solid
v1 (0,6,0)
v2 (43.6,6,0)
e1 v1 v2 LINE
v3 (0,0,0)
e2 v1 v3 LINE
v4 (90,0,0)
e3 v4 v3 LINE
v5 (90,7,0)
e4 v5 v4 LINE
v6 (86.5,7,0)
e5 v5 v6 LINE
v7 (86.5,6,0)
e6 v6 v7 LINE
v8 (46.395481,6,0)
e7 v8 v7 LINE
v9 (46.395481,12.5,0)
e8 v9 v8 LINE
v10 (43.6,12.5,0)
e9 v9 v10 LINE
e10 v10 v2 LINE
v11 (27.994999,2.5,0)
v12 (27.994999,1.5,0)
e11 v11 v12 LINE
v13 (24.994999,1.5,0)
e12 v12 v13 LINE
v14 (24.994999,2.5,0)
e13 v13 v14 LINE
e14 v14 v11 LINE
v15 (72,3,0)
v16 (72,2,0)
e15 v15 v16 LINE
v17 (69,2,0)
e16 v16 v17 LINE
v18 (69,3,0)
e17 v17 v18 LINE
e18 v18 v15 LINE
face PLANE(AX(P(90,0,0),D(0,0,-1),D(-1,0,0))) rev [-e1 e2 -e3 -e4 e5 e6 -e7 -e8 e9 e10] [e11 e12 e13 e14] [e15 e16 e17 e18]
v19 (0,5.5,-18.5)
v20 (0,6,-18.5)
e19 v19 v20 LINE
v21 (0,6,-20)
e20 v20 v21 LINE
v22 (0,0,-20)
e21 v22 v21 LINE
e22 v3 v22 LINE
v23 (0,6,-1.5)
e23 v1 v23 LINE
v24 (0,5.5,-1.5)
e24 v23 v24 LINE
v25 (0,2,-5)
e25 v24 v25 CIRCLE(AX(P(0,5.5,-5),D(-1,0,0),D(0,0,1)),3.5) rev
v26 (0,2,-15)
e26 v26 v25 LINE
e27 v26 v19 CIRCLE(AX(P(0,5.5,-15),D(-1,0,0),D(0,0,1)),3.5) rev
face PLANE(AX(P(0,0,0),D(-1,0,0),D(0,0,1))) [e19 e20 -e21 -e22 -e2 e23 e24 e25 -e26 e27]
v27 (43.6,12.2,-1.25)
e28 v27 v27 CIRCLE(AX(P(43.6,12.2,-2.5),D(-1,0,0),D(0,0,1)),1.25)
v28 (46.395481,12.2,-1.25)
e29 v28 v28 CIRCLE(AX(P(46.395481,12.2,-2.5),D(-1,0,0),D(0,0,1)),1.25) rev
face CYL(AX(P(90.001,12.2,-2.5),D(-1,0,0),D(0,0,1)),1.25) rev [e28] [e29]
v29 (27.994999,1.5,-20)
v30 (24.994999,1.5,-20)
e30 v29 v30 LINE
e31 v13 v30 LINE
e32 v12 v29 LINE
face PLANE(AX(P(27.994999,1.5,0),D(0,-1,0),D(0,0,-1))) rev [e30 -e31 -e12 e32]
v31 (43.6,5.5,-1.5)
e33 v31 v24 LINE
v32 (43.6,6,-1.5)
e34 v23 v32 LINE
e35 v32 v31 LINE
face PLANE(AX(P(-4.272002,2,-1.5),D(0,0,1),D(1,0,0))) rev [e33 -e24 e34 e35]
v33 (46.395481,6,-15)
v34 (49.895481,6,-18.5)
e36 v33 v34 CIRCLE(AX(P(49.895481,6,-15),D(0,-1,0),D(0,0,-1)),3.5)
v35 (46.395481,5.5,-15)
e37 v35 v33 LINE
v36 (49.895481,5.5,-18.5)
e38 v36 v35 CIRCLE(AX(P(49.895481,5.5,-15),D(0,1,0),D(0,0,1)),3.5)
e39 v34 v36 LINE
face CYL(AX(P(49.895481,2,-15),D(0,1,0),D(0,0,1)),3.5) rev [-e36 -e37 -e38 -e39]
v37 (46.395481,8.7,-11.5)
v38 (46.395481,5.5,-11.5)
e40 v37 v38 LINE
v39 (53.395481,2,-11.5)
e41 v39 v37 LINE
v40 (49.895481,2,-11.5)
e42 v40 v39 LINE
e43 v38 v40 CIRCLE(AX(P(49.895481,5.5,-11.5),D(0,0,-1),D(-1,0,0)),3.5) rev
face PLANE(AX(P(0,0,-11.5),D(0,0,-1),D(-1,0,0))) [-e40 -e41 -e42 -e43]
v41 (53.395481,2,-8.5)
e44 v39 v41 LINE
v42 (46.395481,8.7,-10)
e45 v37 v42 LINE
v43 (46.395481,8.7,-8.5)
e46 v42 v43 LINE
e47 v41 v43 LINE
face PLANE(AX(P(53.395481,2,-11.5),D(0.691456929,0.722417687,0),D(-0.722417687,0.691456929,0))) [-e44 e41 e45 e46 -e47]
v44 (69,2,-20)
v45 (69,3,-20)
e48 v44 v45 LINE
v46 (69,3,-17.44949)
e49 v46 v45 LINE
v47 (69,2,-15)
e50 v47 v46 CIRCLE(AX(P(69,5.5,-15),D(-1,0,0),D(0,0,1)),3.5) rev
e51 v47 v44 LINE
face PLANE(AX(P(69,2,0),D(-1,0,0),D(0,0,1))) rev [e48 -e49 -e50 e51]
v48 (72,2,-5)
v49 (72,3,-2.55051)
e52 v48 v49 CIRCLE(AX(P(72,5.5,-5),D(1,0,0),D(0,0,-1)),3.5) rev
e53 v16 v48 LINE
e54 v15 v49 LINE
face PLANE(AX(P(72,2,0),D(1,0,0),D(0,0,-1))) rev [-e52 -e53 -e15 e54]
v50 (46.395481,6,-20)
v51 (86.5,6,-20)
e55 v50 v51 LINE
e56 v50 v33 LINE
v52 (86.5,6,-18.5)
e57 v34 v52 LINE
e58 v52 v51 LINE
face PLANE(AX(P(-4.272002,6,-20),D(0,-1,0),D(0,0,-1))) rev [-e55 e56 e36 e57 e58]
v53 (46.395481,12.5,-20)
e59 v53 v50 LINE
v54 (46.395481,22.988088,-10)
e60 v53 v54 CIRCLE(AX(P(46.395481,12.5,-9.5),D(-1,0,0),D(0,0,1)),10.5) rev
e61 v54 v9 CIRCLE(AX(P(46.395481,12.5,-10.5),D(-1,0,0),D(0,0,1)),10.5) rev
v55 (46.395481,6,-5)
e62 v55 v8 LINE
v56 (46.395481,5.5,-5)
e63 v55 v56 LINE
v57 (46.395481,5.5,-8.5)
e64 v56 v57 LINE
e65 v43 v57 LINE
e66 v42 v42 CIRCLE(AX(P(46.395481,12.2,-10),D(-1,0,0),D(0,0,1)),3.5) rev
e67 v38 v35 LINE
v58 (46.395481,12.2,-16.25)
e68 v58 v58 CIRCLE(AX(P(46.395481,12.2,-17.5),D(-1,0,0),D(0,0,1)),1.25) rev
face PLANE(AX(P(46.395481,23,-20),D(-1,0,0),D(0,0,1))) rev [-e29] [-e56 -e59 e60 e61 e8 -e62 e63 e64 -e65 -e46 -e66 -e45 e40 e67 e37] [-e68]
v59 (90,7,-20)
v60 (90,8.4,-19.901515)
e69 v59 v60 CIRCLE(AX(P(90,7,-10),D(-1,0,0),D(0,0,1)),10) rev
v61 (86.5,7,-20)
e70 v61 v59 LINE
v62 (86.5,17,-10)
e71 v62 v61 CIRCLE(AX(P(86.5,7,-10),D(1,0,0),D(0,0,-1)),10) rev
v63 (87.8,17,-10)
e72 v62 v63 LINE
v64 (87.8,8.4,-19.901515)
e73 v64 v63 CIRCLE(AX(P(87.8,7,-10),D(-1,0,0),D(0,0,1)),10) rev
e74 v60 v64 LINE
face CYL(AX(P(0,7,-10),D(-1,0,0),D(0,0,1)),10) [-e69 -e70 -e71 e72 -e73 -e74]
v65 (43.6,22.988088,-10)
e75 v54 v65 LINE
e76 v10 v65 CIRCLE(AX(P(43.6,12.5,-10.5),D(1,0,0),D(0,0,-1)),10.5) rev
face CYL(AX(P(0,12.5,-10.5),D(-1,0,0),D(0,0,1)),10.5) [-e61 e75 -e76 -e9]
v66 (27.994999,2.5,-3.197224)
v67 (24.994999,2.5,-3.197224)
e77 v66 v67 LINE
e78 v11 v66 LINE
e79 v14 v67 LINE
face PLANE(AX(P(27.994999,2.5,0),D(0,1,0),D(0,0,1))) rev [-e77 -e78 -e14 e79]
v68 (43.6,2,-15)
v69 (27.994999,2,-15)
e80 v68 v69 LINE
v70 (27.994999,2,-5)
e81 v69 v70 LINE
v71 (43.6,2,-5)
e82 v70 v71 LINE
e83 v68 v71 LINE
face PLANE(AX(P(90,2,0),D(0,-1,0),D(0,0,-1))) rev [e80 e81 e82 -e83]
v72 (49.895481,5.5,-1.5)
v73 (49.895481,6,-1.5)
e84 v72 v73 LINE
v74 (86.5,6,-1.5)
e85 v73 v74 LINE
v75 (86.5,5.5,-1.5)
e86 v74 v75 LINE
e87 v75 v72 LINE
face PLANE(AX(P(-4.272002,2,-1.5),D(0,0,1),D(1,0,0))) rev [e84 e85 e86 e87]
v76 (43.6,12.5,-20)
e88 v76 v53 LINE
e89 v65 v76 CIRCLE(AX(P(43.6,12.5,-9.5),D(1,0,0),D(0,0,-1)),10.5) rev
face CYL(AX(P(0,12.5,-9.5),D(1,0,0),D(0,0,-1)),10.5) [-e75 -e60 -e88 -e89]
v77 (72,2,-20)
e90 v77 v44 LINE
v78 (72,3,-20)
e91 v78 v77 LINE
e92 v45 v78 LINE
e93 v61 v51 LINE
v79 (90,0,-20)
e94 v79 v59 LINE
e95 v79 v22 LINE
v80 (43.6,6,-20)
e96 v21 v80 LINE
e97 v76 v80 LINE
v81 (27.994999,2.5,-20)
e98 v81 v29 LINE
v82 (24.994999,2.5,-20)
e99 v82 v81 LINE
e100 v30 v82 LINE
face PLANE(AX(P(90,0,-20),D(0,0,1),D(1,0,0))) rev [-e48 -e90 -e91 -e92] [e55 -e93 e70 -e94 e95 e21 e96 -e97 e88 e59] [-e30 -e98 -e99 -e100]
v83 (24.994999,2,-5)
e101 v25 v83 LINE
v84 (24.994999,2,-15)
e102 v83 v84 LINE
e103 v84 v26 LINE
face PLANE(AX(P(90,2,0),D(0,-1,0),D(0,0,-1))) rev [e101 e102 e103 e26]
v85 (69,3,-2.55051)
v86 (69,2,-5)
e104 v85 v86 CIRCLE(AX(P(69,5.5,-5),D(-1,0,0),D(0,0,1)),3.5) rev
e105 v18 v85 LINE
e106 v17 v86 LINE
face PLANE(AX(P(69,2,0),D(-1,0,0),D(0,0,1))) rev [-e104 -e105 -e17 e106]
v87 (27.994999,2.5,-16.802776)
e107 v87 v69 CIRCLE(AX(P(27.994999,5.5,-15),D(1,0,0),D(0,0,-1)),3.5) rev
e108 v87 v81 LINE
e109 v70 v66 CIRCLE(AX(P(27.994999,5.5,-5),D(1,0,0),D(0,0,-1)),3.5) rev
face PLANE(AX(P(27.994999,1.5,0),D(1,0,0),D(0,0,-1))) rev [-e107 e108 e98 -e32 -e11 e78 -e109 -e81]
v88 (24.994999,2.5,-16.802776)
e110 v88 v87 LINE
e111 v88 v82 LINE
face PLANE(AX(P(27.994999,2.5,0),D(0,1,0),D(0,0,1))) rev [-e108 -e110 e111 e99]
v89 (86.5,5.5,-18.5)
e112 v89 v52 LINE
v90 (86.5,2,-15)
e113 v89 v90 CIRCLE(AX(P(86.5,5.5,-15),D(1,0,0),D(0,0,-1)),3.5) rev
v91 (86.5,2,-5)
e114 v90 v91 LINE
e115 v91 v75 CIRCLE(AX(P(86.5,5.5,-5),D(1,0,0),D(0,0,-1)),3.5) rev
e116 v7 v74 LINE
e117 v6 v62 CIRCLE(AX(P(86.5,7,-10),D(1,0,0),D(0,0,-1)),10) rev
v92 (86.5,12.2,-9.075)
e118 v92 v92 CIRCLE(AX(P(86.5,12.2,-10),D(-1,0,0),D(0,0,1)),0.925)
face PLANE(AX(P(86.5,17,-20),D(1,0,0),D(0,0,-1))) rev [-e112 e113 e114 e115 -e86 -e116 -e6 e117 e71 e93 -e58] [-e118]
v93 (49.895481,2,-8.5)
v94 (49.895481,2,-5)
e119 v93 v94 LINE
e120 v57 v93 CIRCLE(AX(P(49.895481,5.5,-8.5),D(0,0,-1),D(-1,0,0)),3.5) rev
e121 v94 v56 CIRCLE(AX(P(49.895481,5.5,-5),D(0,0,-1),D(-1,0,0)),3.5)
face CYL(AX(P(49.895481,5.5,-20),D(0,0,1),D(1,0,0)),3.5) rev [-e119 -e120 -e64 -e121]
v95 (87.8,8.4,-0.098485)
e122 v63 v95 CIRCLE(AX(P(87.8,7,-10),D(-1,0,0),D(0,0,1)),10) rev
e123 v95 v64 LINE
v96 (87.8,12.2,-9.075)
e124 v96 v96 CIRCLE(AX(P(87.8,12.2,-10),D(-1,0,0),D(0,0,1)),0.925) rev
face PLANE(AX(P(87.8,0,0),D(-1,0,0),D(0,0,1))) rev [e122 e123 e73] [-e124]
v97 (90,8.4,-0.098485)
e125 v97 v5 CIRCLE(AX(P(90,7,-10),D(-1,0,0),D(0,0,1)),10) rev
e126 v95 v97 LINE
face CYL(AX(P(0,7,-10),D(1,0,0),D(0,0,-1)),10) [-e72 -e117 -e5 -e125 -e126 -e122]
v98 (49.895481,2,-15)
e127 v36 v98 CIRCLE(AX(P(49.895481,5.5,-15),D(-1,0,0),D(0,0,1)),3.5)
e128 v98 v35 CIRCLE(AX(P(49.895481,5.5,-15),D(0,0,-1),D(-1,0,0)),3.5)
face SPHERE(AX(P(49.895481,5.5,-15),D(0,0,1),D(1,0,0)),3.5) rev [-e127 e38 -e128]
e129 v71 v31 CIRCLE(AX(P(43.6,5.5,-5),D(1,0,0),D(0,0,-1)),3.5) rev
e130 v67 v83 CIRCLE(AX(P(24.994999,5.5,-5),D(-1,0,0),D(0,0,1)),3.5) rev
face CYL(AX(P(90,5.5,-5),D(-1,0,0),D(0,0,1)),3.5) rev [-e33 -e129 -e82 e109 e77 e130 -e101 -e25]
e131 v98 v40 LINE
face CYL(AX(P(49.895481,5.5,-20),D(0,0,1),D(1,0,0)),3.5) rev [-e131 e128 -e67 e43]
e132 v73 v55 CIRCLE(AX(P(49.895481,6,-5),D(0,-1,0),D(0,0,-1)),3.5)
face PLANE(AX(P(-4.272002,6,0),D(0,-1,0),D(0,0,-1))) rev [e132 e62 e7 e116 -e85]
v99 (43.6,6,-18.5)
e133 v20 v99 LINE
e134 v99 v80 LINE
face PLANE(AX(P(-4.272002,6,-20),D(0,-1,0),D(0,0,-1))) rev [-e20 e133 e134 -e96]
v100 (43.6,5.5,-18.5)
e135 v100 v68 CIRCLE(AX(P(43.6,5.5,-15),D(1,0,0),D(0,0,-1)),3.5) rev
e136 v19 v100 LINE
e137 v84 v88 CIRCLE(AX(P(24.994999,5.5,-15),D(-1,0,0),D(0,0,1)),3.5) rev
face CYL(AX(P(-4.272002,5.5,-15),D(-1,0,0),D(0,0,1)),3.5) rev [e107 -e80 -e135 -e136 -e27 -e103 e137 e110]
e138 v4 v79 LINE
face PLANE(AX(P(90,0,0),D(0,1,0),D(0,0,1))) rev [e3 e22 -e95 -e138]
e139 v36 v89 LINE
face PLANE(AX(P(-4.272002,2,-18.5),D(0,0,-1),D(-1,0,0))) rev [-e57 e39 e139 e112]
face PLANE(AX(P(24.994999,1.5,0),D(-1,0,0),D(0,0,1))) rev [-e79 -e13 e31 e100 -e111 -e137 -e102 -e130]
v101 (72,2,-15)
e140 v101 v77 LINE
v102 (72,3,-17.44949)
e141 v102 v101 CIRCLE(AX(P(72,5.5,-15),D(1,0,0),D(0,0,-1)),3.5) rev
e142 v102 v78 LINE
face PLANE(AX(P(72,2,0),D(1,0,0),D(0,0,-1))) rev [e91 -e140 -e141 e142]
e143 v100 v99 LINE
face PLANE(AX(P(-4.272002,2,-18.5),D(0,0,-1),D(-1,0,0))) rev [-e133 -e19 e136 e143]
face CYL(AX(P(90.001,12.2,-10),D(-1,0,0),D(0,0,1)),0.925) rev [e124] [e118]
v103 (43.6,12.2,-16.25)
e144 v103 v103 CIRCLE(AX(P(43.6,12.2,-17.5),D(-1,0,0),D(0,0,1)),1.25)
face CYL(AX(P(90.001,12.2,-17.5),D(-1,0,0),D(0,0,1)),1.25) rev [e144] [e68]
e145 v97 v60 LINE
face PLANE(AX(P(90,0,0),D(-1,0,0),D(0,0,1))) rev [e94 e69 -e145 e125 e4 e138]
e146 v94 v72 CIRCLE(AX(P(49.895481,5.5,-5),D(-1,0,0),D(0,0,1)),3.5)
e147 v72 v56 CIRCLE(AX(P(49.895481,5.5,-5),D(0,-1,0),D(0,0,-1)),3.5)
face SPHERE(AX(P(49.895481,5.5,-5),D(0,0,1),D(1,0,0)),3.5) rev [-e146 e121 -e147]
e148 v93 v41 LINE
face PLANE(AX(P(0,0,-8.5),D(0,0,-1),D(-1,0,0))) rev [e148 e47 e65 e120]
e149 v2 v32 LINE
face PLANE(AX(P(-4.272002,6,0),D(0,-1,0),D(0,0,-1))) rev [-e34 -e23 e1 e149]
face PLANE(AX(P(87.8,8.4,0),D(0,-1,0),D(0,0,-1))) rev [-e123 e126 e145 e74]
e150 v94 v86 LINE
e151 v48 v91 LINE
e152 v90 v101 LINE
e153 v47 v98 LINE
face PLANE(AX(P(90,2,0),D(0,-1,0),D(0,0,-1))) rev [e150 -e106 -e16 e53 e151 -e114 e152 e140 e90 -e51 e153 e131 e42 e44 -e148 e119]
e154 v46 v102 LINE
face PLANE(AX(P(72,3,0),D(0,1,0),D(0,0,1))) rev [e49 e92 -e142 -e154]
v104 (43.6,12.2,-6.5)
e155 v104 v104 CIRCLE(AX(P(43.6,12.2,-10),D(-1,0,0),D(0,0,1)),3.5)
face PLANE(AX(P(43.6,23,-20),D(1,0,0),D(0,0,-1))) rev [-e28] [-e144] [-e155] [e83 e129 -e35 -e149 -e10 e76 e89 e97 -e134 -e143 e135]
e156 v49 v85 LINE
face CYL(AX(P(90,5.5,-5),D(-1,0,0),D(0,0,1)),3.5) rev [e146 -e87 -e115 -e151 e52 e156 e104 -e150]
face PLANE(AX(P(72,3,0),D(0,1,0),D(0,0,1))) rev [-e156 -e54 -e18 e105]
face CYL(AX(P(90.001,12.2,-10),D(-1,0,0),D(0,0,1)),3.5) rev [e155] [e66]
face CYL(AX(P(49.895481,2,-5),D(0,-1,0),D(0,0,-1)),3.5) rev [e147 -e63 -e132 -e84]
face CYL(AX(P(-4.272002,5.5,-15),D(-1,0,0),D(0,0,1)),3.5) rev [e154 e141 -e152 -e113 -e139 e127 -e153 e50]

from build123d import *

# Parameters (mm, degrees)
SKETCH1_W                = 20
SKETCH1_H                = 2
BOSS_EXTRUDE1_DEPTH      = 90
SKETCH2_W                = 2.795480737
SKETCH2_H                = 20
BOSS_EXTRUDE2_DEPTH      = 21
SKETCH3_W                = 3.5
SKETCH3_H                = 20
BOSS_EXTRUDE3_DEPTH      = 15
FILLET1_R                = 10.5
FILLET2_R                = 10
BOSS_EXTRUDE4_REACH      = 93.71
SKETCH4_W                = 1.5
SKETCH4_H                = 4
CUT_EXTRUDE1_REACH       = 57.51
SKETCH5_R                = 1.25
SKETCH5_R_2              = 3.5
CUT_EXTRUDE2_REACH       = 93.71
SKETCH6_R                = 0.925
SKETCH7_W                = 20
SKETCH7_H                = 8.6
CUT_EXTRUDE3_DEPTH       = 2.2
FILLET3_R                = 3.5
FILLET4_R                = 3.5
SKETCH8_W                = 3
SKETCH8_H                = 1
ZIPTIEHOLE_DEPTH         = 96.0181678
BOSS_EXTRUDE5_DEPTH      = 1.5
BOSS_EXTRUDE5_DEPTH_BACK = 1.5


# Some blends are built 0.0001 mm under size
with BuildPart() as part:
    # Sketch1 → Boss-Extrude1 (new body)
    with BuildSketch(Plane(origin=(0, 0, 0), x_dir=(0, 0, -1), z_dir=(1, 0, 0))):
        with Locations((10, 1)):
            Rectangle(SKETCH1_W, SKETCH1_H)
    extrude(amount=BOSS_EXTRUDE1_DEPTH)

    # Sketch2 → Boss-Extrude2 (add)
    with BuildSketch(Plane(origin=(0, 2, 0), x_dir=(1, 0, 0), z_dir=(0, 1, 0))):
        with Locations((44.997740369, 10)):
            Rectangle(SKETCH2_W, SKETCH2_H)
    extrude(amount=BOSS_EXTRUDE2_DEPTH)

    # Sketch3 → Boss-Extrude3 (add)
    with BuildSketch(Plane(origin=(0, 2, 0), x_dir=(1, 0, 0), z_dir=(0, 1, 0))):
        with Locations((88.25, 10)):
            Rectangle(SKETCH3_W, SKETCH3_H)
    extrude(amount=BOSS_EXTRUDE3_DEPTH)

    # Fillet1
    # the kernel refuses this fillet: 10.5 mm, written as the material it takes off along each edge
    with BuildSketch(Plane(origin=(72.645480737, 23, 0), x_dir=(0, 0, -1), z_dir=(-1, 0, 0)), Plane(origin=(17.35, 23, -20), x_dir=(0, 0, 1), z_dir=(1, 0, 0))) as fillet1_piece_1:
        with BuildLine():
            CenterArc((FILLET1_R, FILLET1_R), FILLET1_R, 180, 90)
            Line((0, FILLET1_R), (0, 0))
            Line((0, 0), (FILLET1_R, 0))
        make_face()
    extrude(amount=55.295480737, mode=Mode.SUBTRACT)

    # Fillet2
    fillet2_edges = [part.edges().sort_by_distance(p)[0] for p in [
        (88.25, 17, -20),
        (88.25, 17, 0),
    ]]
    fillet(fillet2_edges, radius=FILLET2_R - 0.0001)  # a hair under: the kernel refuses the full size

    # Boss-Extrude4: up to this face of the body (flat: up to its plane)
    boss_extrude4_end = Plane(part.part.faces().sort_by_distance((0, 1, -10))[0])
    # Sketch4 → Boss-Extrude4 (add, up to the picked face)
    with BuildSketch(Plane.ZY.offset(-86.5), mode=Mode.PRIVATE) as boss_extrude4_sk1:
        with Locations((-0.75, 4)):
            Rectangle(SKETCH4_W, SKETCH4_H)
    boss_extrude4_tool1 = split(extrude(boss_extrude4_sk1.sketch, amount=BOSS_EXTRUDE4_REACH, mode=Mode.PRIVATE), bisect_by=boss_extrude4_end, keep=Keep.BOTH, mode=Mode.PRIVATE)
    # Sketch4 → Boss-Extrude4 (add, up to the picked face)
    with BuildSketch(Plane.ZY.offset(-86.5), mode=Mode.PRIVATE) as boss_extrude4_sk2:
        with Locations((-19.25, 4)):
            Rectangle(SKETCH4_W, SKETCH4_H)
    boss_extrude4_tool2 = split(extrude(boss_extrude4_sk2.sketch, amount=BOSS_EXTRUDE4_REACH, mode=Mode.PRIVATE), bisect_by=boss_extrude4_end, keep=Keep.BOTH, mode=Mode.PRIVATE)
    add(boss_extrude4_tool1.solids().sort_by(Axis((86.5, 4, -0.75), (-1, 0, 0)))[0])
    add(boss_extrude4_tool2.solids().sort_by(Axis((86.5, 4, -19.25), (-1, 0, 0)))[0])

    # Sketch5 → Cut-Extrude1 (cut, up to next)
    with BuildSketch(Plane.ZY.offset(-43.6), mode=Mode.PRIVATE) as cut_extrude1_sk1:
        with Locations((-17.5, 12.2)):
            Circle(SKETCH5_R)
    cut_extrude1_tool1 = extrude(cut_extrude1_sk1.sketch, amount=-CUT_EXTRUDE1_REACH, mode=Mode.PRIVATE) & part.part
    # Sketch5 → Cut-Extrude1 (cut, up to next)
    with BuildSketch(Plane.ZY.offset(-43.6), mode=Mode.PRIVATE) as cut_extrude1_sk2:
        with Locations((-2.5, 12.2)):
            Circle(SKETCH5_R)
    cut_extrude1_tool2 = extrude(cut_extrude1_sk2.sketch, amount=-CUT_EXTRUDE1_REACH, mode=Mode.PRIVATE) & part.part
    # Sketch5 → Cut-Extrude1 (cut, up to next)
    with BuildSketch(Plane.ZY.offset(-43.6), mode=Mode.PRIVATE) as cut_extrude1_sk3:
        with Locations((-10, 12.2)):
            Circle(SKETCH5_R_2)
    cut_extrude1_tool3 = extrude(cut_extrude1_sk3.sketch, amount=-CUT_EXTRUDE1_REACH, mode=Mode.PRIVATE) & part.part
    add(cut_extrude1_tool1.solids().sort_by_distance((43.6, 12.2, -17.5))[0], mode=Mode.SUBTRACT)
    add(cut_extrude1_tool2.solids().sort_by_distance((43.6, 12.2, -2.5))[0], mode=Mode.SUBTRACT)
    add(cut_extrude1_tool3.solids().sort_by_distance((43.6, 12.2, -10))[0], mode=Mode.SUBTRACT)

    # Sketch6 → Cut-Extrude2 (cut, up to next)
    with BuildSketch(Plane.ZY.offset(-86.5), mode=Mode.PRIVATE) as cut_extrude2_sk1:
        with Locations((-10, 12.2)):
            Circle(SKETCH6_R)
    cut_extrude2_tool1 = extrude(cut_extrude2_sk1.sketch, amount=-CUT_EXTRUDE2_REACH, mode=Mode.PRIVATE) & part.part
    add(cut_extrude2_tool1.solids().sort_by_distance((86.5, 12.2, -10))[0], mode=Mode.SUBTRACT)

    # Sketch7 → Cut-Extrude3 (cut)
    with BuildSketch(Plane(origin=(90, 0, 0), x_dir=(0, 0, -1), z_dir=(1, 0, 0))):
        with Locations((10, 12.7)):
            Rectangle(SKETCH7_W, SKETCH7_H)
    extrude(amount=-CUT_EXTRUDE3_DEPTH, mode=Mode.SUBTRACT)

    # Fillet3
    fillet3_edges = [part.edges().sort_by_distance(p)[0] for p in [
        (21.8, 2, -1.5),
        (66.447740368, 2, -1.5),
        (66.447740368, 2, -18.5),
        (21.8, 2, -18.5),
    ]]
    fillet(fillet3_edges, radius=FILLET3_R)

    # Fillet4
    fillet4_edges = [part.edges().sort_by_distance(p)[0] for p in [
        (46.395480737, 2, -10),
        (46.395480737, 5.75, -1.5),
        (46.395480737, 3.025126266, -17.474873734),
        (46.395480737, 3.025126266, -2.525126266),
        (46.395480737, 5.75, -18.5),
    ]]
    fillet(fillet4_edges, radius=FILLET4_R)

    # Sketch8 → zipTieHole (cut, through all)
    with BuildSketch(Plane(origin=(0, 0, -20), x_dir=(-1, 0, 0), z_dir=(0, 0, -1))):
        with Locations((-26.4949995, 2)):
            Rectangle(SKETCH8_W, SKETCH8_H)
        with Locations((-70.5, 2.5)):
            Rectangle(SKETCH8_W, SKETCH8_H)
    extrude(amount=-ZIPTIEHOLE_DEPTH, mode=Mode.SUBTRACT)

    # Sketch10 → Boss-Extrude5 (add, two sides: drawn at the far end of the back side and taken through both)
    with BuildSketch(Plane(origin=(46.395480737, 5.5, -10), x_dir=(1, 0, 0), z_dir=(0, 0, 1)).offset(-BOSS_EXTRUDE5_DEPTH_BACK)):
        Polygon((7, -3.5), (0, 3.2), (0, -3.5), align=None)
    extrude(amount=BOSS_EXTRUDE5_DEPTH + BOSS_EXTRUDE5_DEPTH_BACK)


solid = part.part
